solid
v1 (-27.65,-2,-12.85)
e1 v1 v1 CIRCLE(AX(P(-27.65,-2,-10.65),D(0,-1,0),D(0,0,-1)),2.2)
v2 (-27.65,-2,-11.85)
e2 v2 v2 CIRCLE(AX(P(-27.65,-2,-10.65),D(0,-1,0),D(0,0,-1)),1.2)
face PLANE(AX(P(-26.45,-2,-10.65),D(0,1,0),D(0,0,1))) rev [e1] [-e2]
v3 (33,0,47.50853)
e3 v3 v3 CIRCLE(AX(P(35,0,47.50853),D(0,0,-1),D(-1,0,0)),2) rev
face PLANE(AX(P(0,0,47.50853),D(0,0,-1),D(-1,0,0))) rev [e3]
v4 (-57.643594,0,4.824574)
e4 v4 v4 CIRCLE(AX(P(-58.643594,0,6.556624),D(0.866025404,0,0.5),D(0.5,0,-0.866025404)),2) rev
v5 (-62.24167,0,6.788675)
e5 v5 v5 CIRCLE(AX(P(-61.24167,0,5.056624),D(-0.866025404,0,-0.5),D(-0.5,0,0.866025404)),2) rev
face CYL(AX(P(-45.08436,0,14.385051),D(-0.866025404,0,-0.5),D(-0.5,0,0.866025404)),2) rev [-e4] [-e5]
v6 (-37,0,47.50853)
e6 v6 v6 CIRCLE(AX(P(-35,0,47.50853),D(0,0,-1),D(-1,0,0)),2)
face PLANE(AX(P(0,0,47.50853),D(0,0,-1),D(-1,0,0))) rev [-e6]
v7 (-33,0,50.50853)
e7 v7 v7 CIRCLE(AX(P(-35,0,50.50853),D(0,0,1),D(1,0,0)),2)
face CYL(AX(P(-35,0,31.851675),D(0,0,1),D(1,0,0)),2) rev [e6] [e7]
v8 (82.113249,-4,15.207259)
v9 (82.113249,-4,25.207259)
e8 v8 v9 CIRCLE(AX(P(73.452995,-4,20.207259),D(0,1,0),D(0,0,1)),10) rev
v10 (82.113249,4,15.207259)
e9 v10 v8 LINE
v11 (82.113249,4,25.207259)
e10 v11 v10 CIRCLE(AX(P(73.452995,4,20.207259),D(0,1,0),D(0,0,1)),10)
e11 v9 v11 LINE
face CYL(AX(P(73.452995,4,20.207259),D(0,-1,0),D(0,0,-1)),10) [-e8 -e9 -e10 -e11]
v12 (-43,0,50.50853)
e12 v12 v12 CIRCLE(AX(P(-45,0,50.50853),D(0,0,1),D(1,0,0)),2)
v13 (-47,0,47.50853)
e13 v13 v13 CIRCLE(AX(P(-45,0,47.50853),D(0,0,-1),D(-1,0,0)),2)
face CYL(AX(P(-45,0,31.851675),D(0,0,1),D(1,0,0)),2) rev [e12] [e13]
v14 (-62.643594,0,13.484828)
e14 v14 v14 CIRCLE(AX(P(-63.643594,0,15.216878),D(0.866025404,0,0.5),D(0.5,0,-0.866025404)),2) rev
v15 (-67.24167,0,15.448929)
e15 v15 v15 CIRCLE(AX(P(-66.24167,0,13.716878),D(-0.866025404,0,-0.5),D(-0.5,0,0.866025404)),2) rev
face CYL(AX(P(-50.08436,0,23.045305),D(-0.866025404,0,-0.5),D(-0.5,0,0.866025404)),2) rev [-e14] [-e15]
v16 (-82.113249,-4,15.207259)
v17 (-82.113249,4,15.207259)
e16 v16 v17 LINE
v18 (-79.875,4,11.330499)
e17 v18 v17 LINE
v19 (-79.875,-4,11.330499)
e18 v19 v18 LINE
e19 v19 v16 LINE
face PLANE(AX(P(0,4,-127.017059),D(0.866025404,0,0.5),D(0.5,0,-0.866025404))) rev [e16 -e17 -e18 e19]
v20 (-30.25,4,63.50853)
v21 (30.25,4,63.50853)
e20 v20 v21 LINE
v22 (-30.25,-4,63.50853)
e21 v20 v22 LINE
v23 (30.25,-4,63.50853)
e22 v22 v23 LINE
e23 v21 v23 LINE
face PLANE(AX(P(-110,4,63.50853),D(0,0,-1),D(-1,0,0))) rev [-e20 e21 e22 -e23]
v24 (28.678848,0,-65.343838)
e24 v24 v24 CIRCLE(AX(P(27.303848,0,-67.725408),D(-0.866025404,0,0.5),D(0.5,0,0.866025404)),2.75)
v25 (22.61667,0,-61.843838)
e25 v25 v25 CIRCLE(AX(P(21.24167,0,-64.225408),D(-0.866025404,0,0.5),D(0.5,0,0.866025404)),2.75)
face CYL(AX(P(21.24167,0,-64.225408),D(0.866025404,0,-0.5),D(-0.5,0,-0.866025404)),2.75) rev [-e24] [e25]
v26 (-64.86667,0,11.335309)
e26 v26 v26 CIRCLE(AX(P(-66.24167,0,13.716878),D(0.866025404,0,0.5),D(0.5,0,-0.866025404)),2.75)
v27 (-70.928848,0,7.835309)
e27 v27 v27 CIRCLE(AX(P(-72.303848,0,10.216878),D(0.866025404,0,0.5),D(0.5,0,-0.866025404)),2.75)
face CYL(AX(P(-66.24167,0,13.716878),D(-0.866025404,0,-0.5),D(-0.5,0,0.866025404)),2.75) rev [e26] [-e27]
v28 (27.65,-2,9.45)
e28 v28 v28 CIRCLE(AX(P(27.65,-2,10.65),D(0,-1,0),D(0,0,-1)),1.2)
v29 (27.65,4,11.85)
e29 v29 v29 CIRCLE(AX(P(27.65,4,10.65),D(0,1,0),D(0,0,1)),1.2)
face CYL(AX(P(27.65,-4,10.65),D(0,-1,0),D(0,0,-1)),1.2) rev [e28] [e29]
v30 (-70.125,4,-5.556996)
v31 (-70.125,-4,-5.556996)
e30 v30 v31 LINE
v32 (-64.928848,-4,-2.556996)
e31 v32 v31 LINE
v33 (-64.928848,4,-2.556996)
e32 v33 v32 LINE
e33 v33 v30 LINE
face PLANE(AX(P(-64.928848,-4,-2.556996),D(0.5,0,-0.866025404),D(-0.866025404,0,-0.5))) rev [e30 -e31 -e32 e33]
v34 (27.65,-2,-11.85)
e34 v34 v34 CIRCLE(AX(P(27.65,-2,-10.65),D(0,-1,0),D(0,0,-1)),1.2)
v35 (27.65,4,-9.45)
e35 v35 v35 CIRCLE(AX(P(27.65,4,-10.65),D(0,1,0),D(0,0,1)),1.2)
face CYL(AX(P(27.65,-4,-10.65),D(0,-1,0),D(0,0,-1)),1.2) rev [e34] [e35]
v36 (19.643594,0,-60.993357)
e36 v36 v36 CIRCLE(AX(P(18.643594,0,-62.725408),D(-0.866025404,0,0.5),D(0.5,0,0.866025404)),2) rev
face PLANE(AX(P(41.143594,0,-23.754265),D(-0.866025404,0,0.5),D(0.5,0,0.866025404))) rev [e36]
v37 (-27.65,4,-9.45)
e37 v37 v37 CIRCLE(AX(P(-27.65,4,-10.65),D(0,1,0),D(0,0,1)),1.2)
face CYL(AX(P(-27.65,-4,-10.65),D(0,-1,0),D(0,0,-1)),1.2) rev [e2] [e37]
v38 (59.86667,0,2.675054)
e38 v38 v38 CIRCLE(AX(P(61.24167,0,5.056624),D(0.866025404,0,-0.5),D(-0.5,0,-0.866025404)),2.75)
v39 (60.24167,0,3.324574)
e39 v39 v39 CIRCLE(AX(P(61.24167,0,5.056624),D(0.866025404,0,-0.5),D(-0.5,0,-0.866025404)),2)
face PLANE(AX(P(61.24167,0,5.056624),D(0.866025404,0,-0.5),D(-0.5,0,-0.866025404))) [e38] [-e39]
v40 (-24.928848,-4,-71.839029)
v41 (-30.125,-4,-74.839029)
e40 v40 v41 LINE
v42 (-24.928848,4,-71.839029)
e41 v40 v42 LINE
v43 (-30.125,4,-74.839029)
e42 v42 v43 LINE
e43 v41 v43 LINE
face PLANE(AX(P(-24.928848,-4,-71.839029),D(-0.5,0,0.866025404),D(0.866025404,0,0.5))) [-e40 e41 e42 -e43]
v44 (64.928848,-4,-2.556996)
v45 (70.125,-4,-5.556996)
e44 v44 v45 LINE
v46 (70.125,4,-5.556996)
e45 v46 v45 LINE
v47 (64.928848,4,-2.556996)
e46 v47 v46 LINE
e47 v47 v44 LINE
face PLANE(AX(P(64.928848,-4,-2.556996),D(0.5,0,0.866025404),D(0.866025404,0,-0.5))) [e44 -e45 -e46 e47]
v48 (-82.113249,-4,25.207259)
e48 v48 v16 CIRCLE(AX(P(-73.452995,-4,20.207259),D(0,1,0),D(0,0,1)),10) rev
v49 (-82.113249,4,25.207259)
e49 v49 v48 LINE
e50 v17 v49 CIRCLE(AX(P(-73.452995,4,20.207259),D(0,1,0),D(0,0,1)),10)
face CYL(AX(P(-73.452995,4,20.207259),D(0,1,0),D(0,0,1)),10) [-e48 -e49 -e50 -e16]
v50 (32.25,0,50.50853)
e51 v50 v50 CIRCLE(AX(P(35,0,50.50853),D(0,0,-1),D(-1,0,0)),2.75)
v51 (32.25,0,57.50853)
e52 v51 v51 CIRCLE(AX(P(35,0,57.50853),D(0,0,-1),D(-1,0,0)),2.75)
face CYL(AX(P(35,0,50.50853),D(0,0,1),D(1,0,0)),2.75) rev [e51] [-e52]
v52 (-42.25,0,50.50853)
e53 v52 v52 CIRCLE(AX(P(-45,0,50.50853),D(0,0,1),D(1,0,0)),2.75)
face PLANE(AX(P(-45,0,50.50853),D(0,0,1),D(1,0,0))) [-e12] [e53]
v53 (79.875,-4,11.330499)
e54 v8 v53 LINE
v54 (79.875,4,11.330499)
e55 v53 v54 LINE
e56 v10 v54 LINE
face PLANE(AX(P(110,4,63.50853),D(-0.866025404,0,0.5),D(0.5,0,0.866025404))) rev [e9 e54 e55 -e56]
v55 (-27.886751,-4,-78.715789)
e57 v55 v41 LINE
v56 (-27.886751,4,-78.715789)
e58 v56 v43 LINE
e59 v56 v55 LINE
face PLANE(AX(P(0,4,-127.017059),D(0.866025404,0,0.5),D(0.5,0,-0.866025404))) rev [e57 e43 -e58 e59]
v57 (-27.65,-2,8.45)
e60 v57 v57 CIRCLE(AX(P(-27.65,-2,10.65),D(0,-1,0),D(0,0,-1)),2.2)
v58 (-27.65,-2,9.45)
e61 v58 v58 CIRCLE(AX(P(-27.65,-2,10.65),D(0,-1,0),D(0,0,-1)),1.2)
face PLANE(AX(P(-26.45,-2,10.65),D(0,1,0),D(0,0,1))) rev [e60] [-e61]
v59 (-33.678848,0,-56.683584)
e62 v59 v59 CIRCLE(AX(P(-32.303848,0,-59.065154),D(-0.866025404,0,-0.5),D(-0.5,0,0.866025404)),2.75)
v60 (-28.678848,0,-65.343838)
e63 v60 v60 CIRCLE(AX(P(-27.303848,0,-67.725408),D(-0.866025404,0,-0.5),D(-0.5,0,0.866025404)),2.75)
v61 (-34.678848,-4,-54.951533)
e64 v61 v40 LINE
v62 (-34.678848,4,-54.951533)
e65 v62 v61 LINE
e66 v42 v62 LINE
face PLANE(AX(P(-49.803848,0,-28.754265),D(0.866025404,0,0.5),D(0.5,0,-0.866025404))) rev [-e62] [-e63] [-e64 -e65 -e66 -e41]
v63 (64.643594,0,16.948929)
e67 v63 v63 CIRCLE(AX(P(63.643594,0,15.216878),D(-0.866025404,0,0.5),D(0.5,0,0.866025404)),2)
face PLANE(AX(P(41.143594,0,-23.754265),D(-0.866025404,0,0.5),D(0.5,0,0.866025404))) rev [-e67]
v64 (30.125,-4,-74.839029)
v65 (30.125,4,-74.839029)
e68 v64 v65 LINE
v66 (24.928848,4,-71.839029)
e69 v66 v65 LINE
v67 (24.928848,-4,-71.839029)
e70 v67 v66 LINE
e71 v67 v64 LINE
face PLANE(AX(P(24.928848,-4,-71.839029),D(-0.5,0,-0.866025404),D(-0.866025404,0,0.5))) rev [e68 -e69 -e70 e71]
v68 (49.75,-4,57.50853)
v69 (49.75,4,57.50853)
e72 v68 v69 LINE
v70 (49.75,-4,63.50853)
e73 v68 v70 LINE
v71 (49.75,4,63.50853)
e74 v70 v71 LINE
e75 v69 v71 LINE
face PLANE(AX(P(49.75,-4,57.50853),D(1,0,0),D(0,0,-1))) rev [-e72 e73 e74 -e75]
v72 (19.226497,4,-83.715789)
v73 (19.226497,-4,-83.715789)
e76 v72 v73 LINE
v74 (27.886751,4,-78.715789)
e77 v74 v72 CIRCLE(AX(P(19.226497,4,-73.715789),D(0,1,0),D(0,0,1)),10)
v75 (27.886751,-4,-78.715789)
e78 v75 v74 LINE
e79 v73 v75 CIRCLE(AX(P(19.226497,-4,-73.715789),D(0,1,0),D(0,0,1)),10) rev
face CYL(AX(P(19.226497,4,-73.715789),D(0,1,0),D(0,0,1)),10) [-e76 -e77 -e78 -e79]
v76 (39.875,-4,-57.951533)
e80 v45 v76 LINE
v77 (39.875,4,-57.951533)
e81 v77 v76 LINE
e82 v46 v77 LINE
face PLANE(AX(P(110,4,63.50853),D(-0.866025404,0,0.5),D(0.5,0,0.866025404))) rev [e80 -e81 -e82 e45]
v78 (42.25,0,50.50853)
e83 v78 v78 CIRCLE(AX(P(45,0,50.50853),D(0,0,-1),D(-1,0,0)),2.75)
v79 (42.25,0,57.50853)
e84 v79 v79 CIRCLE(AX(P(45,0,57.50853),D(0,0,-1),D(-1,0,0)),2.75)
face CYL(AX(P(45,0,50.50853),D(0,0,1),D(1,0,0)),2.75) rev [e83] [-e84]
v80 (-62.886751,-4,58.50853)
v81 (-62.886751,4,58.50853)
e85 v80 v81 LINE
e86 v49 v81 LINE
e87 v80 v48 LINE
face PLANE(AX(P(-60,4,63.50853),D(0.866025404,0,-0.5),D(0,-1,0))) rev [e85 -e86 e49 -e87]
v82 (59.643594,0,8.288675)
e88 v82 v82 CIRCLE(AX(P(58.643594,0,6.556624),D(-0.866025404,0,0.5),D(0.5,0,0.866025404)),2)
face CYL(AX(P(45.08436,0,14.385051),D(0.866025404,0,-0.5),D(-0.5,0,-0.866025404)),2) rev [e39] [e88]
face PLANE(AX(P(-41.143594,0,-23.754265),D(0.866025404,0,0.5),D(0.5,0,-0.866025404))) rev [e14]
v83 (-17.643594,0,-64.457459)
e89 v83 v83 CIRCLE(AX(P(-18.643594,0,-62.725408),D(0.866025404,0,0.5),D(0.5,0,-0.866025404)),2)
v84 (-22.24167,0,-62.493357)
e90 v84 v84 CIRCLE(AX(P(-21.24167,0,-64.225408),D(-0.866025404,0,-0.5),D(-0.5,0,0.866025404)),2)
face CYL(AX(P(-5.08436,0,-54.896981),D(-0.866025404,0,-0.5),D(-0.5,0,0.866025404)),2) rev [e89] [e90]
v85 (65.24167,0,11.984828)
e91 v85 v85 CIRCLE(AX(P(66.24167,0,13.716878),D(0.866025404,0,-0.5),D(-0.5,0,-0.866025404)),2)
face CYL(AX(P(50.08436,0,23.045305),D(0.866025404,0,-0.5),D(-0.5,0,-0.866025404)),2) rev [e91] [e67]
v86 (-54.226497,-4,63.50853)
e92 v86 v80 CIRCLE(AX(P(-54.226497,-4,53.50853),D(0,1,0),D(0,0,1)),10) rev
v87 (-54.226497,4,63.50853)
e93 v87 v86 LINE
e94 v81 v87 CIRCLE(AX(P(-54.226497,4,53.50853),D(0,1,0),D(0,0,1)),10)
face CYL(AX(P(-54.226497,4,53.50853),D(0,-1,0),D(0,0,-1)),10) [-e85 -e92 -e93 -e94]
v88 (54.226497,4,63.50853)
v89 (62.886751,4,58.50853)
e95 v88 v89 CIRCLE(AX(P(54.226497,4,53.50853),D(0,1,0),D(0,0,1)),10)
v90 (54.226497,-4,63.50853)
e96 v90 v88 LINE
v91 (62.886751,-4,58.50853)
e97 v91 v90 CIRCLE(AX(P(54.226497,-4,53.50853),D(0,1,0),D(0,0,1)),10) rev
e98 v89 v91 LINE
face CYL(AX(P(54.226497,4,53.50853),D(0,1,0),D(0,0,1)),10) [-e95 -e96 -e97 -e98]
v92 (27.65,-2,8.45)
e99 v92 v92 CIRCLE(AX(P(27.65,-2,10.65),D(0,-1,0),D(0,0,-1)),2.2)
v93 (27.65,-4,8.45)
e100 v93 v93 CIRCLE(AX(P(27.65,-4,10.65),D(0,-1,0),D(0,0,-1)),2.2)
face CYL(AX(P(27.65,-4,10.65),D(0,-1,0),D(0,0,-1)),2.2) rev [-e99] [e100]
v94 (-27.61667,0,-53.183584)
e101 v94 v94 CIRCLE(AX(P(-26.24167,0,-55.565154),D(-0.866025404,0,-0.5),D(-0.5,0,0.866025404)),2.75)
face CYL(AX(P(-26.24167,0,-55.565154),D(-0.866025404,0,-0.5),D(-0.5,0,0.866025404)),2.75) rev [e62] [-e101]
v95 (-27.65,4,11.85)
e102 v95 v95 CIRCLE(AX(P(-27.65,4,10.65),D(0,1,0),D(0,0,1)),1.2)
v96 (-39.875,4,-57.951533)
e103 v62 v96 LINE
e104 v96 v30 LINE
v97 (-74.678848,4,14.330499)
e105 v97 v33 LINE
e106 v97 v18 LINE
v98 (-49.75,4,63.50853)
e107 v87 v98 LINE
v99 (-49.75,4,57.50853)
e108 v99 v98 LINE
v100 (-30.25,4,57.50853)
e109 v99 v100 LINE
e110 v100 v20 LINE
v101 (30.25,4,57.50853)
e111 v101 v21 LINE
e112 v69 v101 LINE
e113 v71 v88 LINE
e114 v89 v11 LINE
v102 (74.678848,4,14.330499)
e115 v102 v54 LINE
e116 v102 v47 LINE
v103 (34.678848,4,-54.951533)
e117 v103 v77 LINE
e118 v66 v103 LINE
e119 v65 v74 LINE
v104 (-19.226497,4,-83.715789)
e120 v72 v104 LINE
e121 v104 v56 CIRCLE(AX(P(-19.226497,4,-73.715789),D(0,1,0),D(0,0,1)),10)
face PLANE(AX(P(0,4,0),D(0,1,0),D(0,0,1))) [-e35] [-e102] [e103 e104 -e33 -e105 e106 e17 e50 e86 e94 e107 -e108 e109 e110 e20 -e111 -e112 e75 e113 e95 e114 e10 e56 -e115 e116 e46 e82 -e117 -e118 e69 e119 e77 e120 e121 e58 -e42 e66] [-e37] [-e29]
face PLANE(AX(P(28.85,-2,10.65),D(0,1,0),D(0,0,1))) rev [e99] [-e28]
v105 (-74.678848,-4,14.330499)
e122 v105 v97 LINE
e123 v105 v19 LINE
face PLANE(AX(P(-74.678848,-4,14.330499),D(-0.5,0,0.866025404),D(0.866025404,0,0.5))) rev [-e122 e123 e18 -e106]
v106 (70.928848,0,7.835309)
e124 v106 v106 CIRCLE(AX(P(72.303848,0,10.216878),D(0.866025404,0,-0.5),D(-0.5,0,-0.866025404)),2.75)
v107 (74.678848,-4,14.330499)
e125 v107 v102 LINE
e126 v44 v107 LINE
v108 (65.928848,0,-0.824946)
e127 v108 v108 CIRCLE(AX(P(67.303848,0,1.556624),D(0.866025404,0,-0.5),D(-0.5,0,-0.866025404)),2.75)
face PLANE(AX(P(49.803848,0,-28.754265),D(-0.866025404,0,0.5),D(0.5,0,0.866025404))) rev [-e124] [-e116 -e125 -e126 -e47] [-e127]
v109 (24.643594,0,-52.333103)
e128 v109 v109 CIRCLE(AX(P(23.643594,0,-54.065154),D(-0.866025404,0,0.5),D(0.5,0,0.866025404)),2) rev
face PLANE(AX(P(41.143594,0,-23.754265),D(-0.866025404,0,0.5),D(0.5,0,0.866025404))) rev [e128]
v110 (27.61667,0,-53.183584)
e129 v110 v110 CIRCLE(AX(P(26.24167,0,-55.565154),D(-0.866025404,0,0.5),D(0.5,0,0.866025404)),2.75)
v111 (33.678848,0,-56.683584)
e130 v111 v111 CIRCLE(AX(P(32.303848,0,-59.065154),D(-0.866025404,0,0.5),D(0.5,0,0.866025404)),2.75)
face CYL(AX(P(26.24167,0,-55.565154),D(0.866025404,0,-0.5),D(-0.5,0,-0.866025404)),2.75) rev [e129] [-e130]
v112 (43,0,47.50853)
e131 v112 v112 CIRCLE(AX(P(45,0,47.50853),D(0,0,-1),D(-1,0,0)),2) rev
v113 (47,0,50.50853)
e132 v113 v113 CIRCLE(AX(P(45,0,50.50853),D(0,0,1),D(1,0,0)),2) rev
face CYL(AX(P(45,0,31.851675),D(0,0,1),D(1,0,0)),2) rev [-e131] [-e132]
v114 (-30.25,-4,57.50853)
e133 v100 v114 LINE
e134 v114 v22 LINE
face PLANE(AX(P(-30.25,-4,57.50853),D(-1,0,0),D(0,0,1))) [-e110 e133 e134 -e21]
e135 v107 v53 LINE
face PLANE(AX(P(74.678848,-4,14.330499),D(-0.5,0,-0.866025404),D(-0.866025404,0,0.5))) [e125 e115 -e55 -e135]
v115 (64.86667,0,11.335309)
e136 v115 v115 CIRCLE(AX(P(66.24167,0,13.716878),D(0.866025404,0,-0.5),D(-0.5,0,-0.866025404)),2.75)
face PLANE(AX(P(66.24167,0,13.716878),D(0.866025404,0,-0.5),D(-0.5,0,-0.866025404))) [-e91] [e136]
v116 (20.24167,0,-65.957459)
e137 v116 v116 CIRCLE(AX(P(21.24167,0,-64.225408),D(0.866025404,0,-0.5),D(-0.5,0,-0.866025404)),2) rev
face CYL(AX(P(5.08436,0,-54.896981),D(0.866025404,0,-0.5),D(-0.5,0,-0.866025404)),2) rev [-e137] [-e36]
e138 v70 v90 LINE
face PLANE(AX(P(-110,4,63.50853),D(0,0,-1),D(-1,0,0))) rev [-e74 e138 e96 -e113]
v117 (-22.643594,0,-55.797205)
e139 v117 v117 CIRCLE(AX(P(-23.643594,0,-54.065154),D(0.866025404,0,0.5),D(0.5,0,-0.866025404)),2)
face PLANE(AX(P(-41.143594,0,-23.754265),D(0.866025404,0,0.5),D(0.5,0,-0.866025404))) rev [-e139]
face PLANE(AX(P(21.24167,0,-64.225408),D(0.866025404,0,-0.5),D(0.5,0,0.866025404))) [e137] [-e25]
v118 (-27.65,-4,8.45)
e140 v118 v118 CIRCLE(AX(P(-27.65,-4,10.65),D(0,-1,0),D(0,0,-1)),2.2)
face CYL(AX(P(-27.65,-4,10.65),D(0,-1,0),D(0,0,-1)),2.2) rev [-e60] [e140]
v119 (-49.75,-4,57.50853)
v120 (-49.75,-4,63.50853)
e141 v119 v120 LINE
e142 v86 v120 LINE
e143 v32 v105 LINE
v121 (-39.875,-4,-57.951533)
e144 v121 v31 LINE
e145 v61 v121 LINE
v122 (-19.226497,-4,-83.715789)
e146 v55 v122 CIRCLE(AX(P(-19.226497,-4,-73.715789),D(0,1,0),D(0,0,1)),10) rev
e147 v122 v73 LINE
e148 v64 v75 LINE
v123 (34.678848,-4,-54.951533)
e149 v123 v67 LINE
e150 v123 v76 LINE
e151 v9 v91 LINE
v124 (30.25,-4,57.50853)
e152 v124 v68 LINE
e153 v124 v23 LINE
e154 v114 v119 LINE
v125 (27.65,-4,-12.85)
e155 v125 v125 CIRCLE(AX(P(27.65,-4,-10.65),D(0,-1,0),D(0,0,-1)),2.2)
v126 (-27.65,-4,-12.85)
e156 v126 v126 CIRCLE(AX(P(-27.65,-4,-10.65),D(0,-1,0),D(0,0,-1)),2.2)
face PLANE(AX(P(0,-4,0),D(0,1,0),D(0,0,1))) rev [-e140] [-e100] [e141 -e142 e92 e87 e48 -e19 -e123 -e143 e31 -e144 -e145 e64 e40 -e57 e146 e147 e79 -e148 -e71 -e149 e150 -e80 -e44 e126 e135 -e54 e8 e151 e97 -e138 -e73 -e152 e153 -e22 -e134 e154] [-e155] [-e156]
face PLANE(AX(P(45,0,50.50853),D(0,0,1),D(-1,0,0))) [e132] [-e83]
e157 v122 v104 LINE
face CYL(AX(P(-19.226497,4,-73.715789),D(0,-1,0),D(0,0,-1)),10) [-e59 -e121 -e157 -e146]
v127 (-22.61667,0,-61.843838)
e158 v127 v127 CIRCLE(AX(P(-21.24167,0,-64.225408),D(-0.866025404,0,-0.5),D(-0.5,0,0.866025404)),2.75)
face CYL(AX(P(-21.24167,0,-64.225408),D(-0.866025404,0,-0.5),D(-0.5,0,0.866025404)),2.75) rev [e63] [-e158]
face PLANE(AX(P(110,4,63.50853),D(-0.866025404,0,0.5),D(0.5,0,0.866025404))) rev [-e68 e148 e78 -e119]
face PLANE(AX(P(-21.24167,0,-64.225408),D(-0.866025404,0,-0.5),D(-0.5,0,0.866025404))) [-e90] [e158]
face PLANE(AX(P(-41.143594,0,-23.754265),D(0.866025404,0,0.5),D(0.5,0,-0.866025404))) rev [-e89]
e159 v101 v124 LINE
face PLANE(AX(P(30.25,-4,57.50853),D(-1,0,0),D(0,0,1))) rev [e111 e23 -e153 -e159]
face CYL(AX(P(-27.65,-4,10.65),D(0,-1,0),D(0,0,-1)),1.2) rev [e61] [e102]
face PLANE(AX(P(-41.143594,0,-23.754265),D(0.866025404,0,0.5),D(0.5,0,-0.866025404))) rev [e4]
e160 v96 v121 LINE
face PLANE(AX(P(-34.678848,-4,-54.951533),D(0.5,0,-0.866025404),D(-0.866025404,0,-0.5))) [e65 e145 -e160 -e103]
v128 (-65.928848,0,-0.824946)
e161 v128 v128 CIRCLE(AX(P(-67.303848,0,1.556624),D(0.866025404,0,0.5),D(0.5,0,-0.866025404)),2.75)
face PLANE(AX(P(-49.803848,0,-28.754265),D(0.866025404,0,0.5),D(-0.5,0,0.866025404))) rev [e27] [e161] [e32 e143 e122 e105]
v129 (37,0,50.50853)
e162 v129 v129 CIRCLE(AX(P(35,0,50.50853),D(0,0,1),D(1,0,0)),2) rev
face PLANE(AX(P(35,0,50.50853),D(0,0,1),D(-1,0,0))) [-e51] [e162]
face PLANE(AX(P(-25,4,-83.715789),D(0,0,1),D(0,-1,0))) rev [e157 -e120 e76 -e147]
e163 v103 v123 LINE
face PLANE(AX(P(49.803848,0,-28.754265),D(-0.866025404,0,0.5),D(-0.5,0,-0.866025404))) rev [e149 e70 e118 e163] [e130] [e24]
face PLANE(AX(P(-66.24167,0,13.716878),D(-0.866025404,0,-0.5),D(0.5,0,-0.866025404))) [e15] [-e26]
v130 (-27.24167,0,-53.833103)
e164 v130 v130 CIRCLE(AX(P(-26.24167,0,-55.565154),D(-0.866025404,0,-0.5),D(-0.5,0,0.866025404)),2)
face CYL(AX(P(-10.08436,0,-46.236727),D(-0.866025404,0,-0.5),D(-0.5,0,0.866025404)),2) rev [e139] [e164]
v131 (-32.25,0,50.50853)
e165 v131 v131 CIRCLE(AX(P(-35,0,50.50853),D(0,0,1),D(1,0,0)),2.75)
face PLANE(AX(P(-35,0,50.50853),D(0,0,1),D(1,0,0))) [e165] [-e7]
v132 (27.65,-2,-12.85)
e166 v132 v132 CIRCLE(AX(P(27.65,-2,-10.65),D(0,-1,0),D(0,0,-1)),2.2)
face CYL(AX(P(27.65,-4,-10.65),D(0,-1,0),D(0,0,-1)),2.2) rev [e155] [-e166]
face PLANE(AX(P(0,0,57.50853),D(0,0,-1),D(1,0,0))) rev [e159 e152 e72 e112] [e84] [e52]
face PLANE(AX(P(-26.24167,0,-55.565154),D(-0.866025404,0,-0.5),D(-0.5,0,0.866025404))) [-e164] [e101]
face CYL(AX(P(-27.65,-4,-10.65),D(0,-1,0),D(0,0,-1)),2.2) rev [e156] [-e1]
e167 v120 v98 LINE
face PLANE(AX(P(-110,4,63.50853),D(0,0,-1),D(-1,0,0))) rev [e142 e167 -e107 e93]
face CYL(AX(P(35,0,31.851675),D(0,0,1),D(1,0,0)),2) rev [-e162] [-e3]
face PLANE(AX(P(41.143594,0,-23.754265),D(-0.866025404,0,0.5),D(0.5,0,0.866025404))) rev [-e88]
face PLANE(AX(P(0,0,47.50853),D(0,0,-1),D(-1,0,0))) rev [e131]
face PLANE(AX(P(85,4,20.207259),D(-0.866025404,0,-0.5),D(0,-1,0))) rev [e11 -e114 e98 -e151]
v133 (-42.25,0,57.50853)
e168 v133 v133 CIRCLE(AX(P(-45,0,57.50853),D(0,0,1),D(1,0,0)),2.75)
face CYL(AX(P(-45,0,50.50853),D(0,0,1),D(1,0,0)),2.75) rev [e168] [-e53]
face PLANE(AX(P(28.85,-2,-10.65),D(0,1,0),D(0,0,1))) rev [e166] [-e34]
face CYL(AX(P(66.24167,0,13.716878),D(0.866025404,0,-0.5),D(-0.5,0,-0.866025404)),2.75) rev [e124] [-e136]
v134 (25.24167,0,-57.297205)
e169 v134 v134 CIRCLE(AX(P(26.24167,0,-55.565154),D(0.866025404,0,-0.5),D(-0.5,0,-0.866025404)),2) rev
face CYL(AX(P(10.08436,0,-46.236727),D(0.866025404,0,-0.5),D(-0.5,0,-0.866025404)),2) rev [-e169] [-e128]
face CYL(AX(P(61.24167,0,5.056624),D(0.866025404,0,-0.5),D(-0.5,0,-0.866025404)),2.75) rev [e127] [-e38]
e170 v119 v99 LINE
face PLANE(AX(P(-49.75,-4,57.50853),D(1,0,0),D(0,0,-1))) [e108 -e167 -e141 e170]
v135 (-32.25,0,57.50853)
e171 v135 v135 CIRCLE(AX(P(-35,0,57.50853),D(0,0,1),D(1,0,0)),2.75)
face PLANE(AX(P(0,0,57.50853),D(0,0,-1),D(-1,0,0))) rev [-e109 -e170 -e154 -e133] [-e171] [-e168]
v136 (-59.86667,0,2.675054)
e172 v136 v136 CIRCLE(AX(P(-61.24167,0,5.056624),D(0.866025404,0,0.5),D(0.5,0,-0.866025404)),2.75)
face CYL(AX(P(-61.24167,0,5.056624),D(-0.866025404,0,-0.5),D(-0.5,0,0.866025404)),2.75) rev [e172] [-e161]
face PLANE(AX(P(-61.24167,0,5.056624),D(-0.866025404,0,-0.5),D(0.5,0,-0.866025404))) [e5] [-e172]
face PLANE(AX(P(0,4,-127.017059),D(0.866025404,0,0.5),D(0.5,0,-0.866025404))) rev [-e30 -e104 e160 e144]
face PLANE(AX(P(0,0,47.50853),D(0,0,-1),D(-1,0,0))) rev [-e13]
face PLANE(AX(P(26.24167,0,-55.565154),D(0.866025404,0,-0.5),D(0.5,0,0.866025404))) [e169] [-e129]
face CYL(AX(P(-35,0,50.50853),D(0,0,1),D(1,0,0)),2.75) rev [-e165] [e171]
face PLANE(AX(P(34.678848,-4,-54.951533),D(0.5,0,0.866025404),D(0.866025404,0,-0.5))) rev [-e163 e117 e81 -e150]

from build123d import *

# Parameters (mm, degrees)
BOSS_EXTRUDE1_DEPTH            = 4
CHAMFER1_SIZE                  = 50
SKETCH4_W                      = 19.5
SKETCH4_H                      = 8
SKETCH4_R                      = 2
CUT_EXTRUDE1_DEPTH             = 6
SKETCH4_2_R                    = 2
CUT_EXTRUDE2_DEPTH             = 16
SKETCH9_R                      = 2.75
CUT_EXTRUDE3_DEPTH             = 7
CRVPATTERN1_START              = -63.508529611
CRVPATTERN1_OUTLINE_W          = 19.5
CRVPATTERN1_OUTLINE_H          = 8
CRVPATTERN1_DEPTH              = 6
CRVPATTERN1_START_2            = -57.508529611
CRVPATTERN1_2_OUTLINE_R        = 2.75
CRVPATTERN1_2_DEPTH            = 7
CRVPATTERN1_START_3            = -50.508529611
CRVPATTERN1_3_OUTLINE_R        = 2
CRVPATTERN1_3_DEPTH            = 3
CRVPATTERN1_START_4            = 57.508529611
CRVPATTERN1_4_OUTLINE_W        = 19.5
CRVPATTERN1_4_OUTLINE_H        = 8
CRVPATTERN1_4_DEPTH            = 6
CRVPATTERN1_START_5            = 50.508529611
CRVPATTERN1_5_OUTLINE_R        = 2.75
CRVPATTERN1_5_DEPTH            = 7
CRVPATTERN1_START_6            = 47.508529611
CRVPATTERN1_6_OUTLINE_R        = 2
CRVPATTERN1_6_DEPTH            = 3
FILLET1_R                      = 10
CBORE_FOR_M2_SHCS1_D           = 2.4
CBORE_FOR_M2_SHCS1_CBORE_D     = 4.4
CBORE_FOR_M2_SHCS1_CBORE_DEPTH = 2


# Read off the part's stored shape, not the designer's step: CrvPattern1
with BuildPart() as part:
    # Sketch1 → Boss-Extrude1 (new, symmetric)
    with BuildSketch(Plane(origin=(0, 0, 0), x_dir=(1, 0, 0), z_dir=(0, 1, 0))):
        Polygon((110, -63.508529611), (0, 127.017059222), (-110, -63.508529611), align=None)
    extrude(amount=BOSS_EXTRUDE1_DEPTH, both=True)

    # Chamfer1
    chamfer1_edges = [part.edges().sort_by_distance(p)[0] for p in [
        (-110, 0, 63.508529611),
        (0, 0, -127.017059222),
        (110, 0, 63.508529611),
    ]]
    chamfer(chamfer1_edges, length=CHAMFER1_SIZE)

    # Sketch4 → Cut-Extrude1 (cut)
    with BuildSketch(Plane(origin=(4.375288244, 0, 63.508529611), x_dir=(-1, 0, 0), z_dir=(0, 0, -1))):
        with Locations((44.375288244, 0)):
            Rectangle(SKETCH4_W, SKETCH4_H)
        with Locations((39.375288244, 0)):
            Circle(SKETCH4_R, mode=Mode.SUBTRACT)
        with Locations((49.375288244, 0)):
            Circle(SKETCH4_R, mode=Mode.SUBTRACT)
    cut_extrude1 = extrude(amount=CUT_EXTRUDE1_DEPTH, mode=Mode.SUBTRACT)

    # Sketch4<2> → Cut-Extrude2 (cut)
    with BuildSketch(Plane(origin=(4.375288244, 0, 63.508529611), x_dir=(-1, 0, 0), z_dir=(0, 0, -1))):
        with Locations((49.375288244, 0)):
            Circle(SKETCH4_2_R)
        with Locations((39.375288244, 0)):
            Circle(SKETCH4_2_R)
    cut_extrude2 = extrude(amount=CUT_EXTRUDE2_DEPTH, mode=Mode.SUBTRACT)

    # Sketch9 → Cut-Extrude3 (cut)
    with BuildSketch(Plane.XY.offset(57.508529611)):
        with Locations((-45, 0)):
            Circle(SKETCH9_R)
        with Locations((-35, 0)):
            Circle(SKETCH9_R)
    cut_extrude3 = extrude(amount=-CUT_EXTRUDE3_DEPTH, mode=Mode.SUBTRACT)

    # Mirror1: Cut-Extrude1, Cut-Extrude2, Cut-Extrude3 across plane
    add(cut_extrude1.mirror(Plane(origin=(0, 0, 0), x_dir=(0, 0, 1), z_dir=(1, 0, 0))), mode=Mode.SUBTRACT)
    add(cut_extrude2.mirror(Plane(origin=(0, 0, 0), x_dir=(0, 0, 1), z_dir=(1, 0, 0))), mode=Mode.SUBTRACT)
    add(cut_extrude3.mirror(Plane(origin=(0, 0, 0), x_dir=(0, 0, 1), z_dir=(1, 0, 0))), mode=Mode.SUBTRACT)

    # CrvPattern1 outline → CrvPattern1 (cut)
    with BuildSketch(Plane(origin=(0, 0, 0), x_dir=(0.499999999999987, 0, -0.8660254037844463), z_dir=(0.8660254037844461, 0, 0.49999999999998707)).offset(CRVPATTERN1_START)):
        with Locations((-40, 0)):
            Rectangle(CRVPATTERN1_OUTLINE_W, CRVPATTERN1_OUTLINE_H)
        with Locations((40, 0)):
            Rectangle(CRVPATTERN1_OUTLINE_W, CRVPATTERN1_OUTLINE_H)
    extrude(amount=CRVPATTERN1_DEPTH, mode=Mode.SUBTRACT)

    # CrvPattern1 2 outline → CrvPattern1 2 (cut)
    with BuildSketch(Plane(origin=(0, 0, 0), x_dir=(0.499999999999987, 0, -0.8660254037844463), z_dir=(0.8660254037844461, 0, 0.49999999999998707)).offset(CRVPATTERN1_START_2)):
        with Locations((-45, 0)):
            Circle(CRVPATTERN1_2_OUTLINE_R)
        with Locations((-35, 0)):
            Circle(CRVPATTERN1_2_OUTLINE_R)
        with Locations((35, 0)):
            Circle(CRVPATTERN1_2_OUTLINE_R)
        with Locations((45, 0)):
            Circle(CRVPATTERN1_2_OUTLINE_R)
    extrude(amount=CRVPATTERN1_2_DEPTH, mode=Mode.SUBTRACT)

    # CrvPattern1 3 outline → CrvPattern1 3 (cut)
    with BuildSketch(Plane(origin=(0, 0, 0), x_dir=(0.499999999999987, 0, -0.8660254037844463), z_dir=(0.8660254037844461, 0, 0.49999999999998707)).offset(CRVPATTERN1_START_3)):
        with Locations((-45, 0)):
            Circle(CRVPATTERN1_3_OUTLINE_R)
        with Locations((-35, 0)):
            Circle(CRVPATTERN1_3_OUTLINE_R)
        with Locations((35, 0)):
            Circle(CRVPATTERN1_3_OUTLINE_R)
        with Locations((45, 0)):
            Circle(CRVPATTERN1_3_OUTLINE_R)
    extrude(amount=CRVPATTERN1_3_DEPTH, mode=Mode.SUBTRACT)

    # CrvPattern1 4 outline → CrvPattern1 4 (cut)
    with BuildSketch(Plane(origin=(0, 0, 0), x_dir=(0.500000000000001, 0, 0.866025403784438), z_dir=(0.866025403784438, 0, -0.500000000000001)).offset(CRVPATTERN1_START_4)):
        with Locations((-40, 0)):
            Rectangle(CRVPATTERN1_4_OUTLINE_W, CRVPATTERN1_4_OUTLINE_H)
        with Locations((40, 0)):
            Rectangle(CRVPATTERN1_4_OUTLINE_W, CRVPATTERN1_4_OUTLINE_H)
    extrude(amount=CRVPATTERN1_4_DEPTH, mode=Mode.SUBTRACT)

    # CrvPattern1 5 outline → CrvPattern1 5 (cut)
    with BuildSketch(Plane(origin=(0, 0, 0), x_dir=(0.500000000000001, 0, 0.866025403784438), z_dir=(0.866025403784438, 0, -0.500000000000001)).offset(CRVPATTERN1_START_5)):
        with Locations((-45, 0)):
            Circle(CRVPATTERN1_5_OUTLINE_R)
        with Locations((-35, 0)):
            Circle(CRVPATTERN1_5_OUTLINE_R)
        with Locations((35, 0)):
            Circle(CRVPATTERN1_5_OUTLINE_R)
        with Locations((45, 0)):
            Circle(CRVPATTERN1_5_OUTLINE_R)
    extrude(amount=CRVPATTERN1_5_DEPTH, mode=Mode.SUBTRACT)

    # CrvPattern1 6 outline → CrvPattern1 6 (cut)
    with BuildSketch(Plane(origin=(0, 0, 0), x_dir=(0.500000000000001, 0, 0.866025403784438), z_dir=(0.866025403784438, 0, -0.500000000000001)).offset(CRVPATTERN1_START_6)):
        with Locations((-45, 0)):
            Circle(CRVPATTERN1_6_OUTLINE_R)
        with Locations((-35, 0)):
            Circle(CRVPATTERN1_6_OUTLINE_R)
        with Locations((35, 0)):
            Circle(CRVPATTERN1_6_OUTLINE_R)
        with Locations((45, 0)):
            Circle(CRVPATTERN1_6_OUTLINE_R)
    extrude(amount=CRVPATTERN1_6_DEPTH, mode=Mode.SUBTRACT)

    # Fillet1
    fillet1_edges = [part.edges().sort_by_distance(p)[0] for p in [
        (60, 0, 63.508529611),
        (-60, 0, 63.508529611),
        (-25, 0, -83.715789032),
        (-85, 0, 20.207259422),
        (25, 0, -83.715789032),
        (85, 0, 20.207259422),
    ]]
    fillet(fillet1_edges, radius=FILLET1_R)

    # CBORE for M2 SHCS1 (through all)
    with Locations(Plane(origin=(0, -4, 0), x_dir=(-1, 0, 0), z_dir=(0, -1, 0))):
        with Locations((-27.65, -10.65), (27.65, 10.65), (27.65, -10.65), (-27.65, 10.65)):
            CounterBoreHole(CBORE_FOR_M2_SHCS1_D / 2, CBORE_FOR_M2_SHCS1_CBORE_D / 2, CBORE_FOR_M2_SHCS1_CBORE_DEPTH)


solid = part.part
